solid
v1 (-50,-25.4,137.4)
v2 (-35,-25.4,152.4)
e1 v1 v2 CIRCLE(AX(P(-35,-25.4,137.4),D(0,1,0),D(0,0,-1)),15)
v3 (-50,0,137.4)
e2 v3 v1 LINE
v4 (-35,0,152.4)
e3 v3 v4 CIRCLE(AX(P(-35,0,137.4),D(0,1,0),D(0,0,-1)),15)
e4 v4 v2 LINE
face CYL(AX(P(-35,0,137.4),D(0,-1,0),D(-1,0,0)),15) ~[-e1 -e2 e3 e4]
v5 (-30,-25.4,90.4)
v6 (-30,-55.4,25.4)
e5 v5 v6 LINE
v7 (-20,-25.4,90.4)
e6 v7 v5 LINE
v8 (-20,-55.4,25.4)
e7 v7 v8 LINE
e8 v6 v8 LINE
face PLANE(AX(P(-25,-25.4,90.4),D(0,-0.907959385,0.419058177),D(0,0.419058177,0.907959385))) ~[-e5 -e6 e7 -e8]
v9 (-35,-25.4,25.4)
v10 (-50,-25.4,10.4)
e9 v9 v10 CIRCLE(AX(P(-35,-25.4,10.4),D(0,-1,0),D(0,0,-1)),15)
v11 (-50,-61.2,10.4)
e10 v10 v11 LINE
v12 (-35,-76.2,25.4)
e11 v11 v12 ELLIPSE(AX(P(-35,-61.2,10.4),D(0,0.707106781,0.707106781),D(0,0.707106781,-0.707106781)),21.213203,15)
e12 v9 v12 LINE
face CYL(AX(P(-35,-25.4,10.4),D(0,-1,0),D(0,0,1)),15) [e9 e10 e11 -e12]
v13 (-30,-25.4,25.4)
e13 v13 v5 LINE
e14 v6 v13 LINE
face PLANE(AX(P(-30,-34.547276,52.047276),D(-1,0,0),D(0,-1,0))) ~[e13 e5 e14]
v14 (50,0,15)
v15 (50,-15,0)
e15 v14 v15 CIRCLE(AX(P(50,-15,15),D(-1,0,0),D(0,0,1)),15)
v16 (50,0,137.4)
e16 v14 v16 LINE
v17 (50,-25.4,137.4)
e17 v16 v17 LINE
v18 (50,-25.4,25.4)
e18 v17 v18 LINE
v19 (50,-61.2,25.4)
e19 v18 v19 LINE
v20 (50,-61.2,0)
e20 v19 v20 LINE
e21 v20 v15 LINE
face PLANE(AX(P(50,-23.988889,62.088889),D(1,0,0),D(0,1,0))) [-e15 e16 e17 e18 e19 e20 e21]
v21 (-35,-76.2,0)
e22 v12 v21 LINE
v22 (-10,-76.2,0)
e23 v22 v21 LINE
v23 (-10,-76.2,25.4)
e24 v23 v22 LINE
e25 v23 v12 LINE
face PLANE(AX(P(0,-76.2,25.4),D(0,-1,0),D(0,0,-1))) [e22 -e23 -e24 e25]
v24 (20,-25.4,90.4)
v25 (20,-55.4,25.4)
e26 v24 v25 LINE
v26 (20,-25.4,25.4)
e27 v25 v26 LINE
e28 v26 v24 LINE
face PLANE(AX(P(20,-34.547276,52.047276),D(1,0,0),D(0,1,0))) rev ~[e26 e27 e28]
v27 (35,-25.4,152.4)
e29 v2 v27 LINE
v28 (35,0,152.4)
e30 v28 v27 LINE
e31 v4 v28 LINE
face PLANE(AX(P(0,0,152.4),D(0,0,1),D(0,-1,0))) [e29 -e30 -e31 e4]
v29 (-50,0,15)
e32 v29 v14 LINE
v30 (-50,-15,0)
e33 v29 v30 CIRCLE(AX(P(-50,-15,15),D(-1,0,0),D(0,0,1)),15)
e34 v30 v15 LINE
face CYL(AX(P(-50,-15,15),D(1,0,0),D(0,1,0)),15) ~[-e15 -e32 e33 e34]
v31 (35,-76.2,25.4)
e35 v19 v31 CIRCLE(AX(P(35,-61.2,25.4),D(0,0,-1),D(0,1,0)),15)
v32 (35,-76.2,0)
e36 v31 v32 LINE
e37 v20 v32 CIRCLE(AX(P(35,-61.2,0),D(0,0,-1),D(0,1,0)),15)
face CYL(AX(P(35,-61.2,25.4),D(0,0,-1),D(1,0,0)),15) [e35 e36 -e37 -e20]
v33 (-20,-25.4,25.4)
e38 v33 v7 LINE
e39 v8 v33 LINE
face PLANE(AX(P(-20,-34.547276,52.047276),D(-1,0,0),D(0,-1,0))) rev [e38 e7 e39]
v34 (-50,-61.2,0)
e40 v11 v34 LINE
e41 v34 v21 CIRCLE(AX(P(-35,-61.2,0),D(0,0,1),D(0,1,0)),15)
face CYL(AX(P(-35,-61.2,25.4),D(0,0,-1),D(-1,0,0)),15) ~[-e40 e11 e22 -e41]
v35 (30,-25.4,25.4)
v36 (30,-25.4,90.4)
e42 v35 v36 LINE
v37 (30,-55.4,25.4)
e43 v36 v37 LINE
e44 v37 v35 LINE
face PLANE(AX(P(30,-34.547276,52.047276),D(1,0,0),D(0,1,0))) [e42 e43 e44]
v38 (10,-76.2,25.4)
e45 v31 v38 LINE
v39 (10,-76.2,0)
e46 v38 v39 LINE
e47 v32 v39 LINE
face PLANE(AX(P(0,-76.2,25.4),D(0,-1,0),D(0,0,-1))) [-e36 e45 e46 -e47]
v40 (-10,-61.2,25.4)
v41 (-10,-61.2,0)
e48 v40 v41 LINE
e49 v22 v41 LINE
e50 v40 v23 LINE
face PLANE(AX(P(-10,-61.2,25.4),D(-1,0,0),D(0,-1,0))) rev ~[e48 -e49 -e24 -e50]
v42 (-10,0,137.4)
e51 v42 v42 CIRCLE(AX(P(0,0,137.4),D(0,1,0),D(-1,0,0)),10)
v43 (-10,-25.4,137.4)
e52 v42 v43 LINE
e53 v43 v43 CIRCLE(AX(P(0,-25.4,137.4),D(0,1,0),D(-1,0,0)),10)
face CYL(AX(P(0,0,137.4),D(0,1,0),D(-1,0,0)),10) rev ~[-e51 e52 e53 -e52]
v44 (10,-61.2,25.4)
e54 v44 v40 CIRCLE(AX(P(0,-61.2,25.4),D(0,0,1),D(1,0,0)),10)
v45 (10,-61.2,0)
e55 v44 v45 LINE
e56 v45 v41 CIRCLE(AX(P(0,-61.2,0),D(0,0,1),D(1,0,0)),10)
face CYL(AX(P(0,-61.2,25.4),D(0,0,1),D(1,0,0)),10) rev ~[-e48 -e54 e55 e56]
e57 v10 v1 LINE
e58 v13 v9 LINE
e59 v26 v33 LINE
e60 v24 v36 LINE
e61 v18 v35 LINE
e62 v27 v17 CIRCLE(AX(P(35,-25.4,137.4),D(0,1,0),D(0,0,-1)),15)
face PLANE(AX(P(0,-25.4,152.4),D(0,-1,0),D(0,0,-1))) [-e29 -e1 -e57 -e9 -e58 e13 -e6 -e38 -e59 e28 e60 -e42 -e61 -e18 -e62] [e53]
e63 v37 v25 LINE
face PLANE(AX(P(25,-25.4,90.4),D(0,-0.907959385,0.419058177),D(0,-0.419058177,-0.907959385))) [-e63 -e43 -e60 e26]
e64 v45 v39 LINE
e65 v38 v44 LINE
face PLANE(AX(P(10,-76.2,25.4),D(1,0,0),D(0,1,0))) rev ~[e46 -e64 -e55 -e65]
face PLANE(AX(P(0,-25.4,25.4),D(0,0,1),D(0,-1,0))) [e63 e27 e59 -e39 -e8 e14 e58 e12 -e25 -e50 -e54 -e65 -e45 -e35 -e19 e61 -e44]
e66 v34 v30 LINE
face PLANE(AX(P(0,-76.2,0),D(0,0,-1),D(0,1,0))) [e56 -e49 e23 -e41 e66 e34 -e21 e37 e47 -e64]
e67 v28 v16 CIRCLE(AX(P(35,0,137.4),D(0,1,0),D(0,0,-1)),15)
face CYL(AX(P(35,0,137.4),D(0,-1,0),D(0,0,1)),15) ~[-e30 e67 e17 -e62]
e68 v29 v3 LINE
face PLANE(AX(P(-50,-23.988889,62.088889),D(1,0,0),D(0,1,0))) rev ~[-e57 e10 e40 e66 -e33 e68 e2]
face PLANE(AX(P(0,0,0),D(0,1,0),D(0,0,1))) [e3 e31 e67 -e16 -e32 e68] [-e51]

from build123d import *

# Parameters (mm, degrees)
F1_DEPTH = 50
F4_DEPTH = 25.401
F2_R     = 10
F5_DEPTH = 76.201
F8_DEPTH = 5
F11_R    = 15


# Not quite as in the source:
# - a feature of the source that left no trace in its solid (it failed there, or was rolled back) is left out
# - a pattern or mirror of a feature is missing from the dataset's text; its kind, count and spacing are read off the source's solid


with BuildPart() as f1:
    # F0 (on Right) → F1 (new body, symmetric)
    with BuildSketch(Plane.YZ):
        Polygon((-76.2, 0), (0, 0), (0, 152.4), (-25.4, 152.4), (-25.4, 25.4), (-76.2, 25.4), align=None)
    extrude(amount=F1_DEPTH, both=True)

    # F3 (on face) → F4 (cut, through all)
    with BuildSketch(Plane.XY.offset(25.4)):
        with BuildLine():
            ThreePointArc((-10, -61.2), (0, -71.2), (10, -61.2))
            ThreePointArc((10, -61.2), (0, -51.2), (-10, -61.2))
        make_face()
        with BuildLine():
            Line((10, -76.2), (10, -61.2))
            ThreePointArc((10, -61.2), (0, -71.2), (-10, -61.2))
            Line((-10, -61.2), (-10, -76.2))
            Line((-10, -76.2), (10, -76.2))
        make_face()
    extrude(amount=-F4_DEPTH, mode=Mode.SUBTRACT)

    # F2 (on face) → F5 (cut, through all)
    with BuildSketch(Plane(origin=(0, 0, 0), x_dir=(-1, 0, 0), z_dir=(0, 1, 0))):
        with Locations((0, 137.4)):
            Circle(F2_R)
    extrude(amount=-F5_DEPTH, mode=Mode.SUBTRACT)

    # F7 (on offset) → F8 (join, symmetric)
    with BuildSketch(Plane.YZ.offset(25)):
        Polygon((-25.4, 25.4), (-25.4, 90.4), (-55.4, 25.4), align=None)
    f8 = extrude(amount=F8_DEPTH, both=True)

    # F8_copies: F8 across plane
    add(f8.mirror(Plane(origin=(0, 0, 0), x_dir=(0, 0, -1), z_dir=(-1, 0, 0))))

    # F11 (call 1 of 5: OpenCascade refuses the feature's edges together)
    f11_edges = [f1.edges().sort_by_distance(p)[0] for p in [
        (-50, -12.7, 152.4),
    ]]
    fillet(f11_edges, radius=F11_R)

    # F11#2 (call 2 of 5)
    f11_2_edges = [f1.edges().sort_by_distance(p)[0] for p in [
        (50, -12.7, 152.4),
    ]]
    fillet(f11_2_edges, radius=F11_R)

    # F11#3 (call 3 of 5)
    f11_3_edges = [f1.edges().sort_by_distance(p)[0] for p in [
        (0, 0, 0),
    ]]
    fillet(f11_3_edges, radius=F11_R)

    # F11#4 (call 4 of 5)
    f11_4_edges = [f1.edges().sort_by_distance(p)[0] for p in [
        (50, -76.2, 12.7),
    ]]
    fillet(f11_4_edges, radius=F11_R)

    # F11#5 (call 5 of 5)
    f11_5_edges = [f1.edges().sort_by_distance(p)[0] for p in [
        (-50, -76.2, 12.7),
        (-50, -50.8, 25.4),
    ]]
    fillet(f11_5_edges, radius=F11_R)


solid = f1.part
